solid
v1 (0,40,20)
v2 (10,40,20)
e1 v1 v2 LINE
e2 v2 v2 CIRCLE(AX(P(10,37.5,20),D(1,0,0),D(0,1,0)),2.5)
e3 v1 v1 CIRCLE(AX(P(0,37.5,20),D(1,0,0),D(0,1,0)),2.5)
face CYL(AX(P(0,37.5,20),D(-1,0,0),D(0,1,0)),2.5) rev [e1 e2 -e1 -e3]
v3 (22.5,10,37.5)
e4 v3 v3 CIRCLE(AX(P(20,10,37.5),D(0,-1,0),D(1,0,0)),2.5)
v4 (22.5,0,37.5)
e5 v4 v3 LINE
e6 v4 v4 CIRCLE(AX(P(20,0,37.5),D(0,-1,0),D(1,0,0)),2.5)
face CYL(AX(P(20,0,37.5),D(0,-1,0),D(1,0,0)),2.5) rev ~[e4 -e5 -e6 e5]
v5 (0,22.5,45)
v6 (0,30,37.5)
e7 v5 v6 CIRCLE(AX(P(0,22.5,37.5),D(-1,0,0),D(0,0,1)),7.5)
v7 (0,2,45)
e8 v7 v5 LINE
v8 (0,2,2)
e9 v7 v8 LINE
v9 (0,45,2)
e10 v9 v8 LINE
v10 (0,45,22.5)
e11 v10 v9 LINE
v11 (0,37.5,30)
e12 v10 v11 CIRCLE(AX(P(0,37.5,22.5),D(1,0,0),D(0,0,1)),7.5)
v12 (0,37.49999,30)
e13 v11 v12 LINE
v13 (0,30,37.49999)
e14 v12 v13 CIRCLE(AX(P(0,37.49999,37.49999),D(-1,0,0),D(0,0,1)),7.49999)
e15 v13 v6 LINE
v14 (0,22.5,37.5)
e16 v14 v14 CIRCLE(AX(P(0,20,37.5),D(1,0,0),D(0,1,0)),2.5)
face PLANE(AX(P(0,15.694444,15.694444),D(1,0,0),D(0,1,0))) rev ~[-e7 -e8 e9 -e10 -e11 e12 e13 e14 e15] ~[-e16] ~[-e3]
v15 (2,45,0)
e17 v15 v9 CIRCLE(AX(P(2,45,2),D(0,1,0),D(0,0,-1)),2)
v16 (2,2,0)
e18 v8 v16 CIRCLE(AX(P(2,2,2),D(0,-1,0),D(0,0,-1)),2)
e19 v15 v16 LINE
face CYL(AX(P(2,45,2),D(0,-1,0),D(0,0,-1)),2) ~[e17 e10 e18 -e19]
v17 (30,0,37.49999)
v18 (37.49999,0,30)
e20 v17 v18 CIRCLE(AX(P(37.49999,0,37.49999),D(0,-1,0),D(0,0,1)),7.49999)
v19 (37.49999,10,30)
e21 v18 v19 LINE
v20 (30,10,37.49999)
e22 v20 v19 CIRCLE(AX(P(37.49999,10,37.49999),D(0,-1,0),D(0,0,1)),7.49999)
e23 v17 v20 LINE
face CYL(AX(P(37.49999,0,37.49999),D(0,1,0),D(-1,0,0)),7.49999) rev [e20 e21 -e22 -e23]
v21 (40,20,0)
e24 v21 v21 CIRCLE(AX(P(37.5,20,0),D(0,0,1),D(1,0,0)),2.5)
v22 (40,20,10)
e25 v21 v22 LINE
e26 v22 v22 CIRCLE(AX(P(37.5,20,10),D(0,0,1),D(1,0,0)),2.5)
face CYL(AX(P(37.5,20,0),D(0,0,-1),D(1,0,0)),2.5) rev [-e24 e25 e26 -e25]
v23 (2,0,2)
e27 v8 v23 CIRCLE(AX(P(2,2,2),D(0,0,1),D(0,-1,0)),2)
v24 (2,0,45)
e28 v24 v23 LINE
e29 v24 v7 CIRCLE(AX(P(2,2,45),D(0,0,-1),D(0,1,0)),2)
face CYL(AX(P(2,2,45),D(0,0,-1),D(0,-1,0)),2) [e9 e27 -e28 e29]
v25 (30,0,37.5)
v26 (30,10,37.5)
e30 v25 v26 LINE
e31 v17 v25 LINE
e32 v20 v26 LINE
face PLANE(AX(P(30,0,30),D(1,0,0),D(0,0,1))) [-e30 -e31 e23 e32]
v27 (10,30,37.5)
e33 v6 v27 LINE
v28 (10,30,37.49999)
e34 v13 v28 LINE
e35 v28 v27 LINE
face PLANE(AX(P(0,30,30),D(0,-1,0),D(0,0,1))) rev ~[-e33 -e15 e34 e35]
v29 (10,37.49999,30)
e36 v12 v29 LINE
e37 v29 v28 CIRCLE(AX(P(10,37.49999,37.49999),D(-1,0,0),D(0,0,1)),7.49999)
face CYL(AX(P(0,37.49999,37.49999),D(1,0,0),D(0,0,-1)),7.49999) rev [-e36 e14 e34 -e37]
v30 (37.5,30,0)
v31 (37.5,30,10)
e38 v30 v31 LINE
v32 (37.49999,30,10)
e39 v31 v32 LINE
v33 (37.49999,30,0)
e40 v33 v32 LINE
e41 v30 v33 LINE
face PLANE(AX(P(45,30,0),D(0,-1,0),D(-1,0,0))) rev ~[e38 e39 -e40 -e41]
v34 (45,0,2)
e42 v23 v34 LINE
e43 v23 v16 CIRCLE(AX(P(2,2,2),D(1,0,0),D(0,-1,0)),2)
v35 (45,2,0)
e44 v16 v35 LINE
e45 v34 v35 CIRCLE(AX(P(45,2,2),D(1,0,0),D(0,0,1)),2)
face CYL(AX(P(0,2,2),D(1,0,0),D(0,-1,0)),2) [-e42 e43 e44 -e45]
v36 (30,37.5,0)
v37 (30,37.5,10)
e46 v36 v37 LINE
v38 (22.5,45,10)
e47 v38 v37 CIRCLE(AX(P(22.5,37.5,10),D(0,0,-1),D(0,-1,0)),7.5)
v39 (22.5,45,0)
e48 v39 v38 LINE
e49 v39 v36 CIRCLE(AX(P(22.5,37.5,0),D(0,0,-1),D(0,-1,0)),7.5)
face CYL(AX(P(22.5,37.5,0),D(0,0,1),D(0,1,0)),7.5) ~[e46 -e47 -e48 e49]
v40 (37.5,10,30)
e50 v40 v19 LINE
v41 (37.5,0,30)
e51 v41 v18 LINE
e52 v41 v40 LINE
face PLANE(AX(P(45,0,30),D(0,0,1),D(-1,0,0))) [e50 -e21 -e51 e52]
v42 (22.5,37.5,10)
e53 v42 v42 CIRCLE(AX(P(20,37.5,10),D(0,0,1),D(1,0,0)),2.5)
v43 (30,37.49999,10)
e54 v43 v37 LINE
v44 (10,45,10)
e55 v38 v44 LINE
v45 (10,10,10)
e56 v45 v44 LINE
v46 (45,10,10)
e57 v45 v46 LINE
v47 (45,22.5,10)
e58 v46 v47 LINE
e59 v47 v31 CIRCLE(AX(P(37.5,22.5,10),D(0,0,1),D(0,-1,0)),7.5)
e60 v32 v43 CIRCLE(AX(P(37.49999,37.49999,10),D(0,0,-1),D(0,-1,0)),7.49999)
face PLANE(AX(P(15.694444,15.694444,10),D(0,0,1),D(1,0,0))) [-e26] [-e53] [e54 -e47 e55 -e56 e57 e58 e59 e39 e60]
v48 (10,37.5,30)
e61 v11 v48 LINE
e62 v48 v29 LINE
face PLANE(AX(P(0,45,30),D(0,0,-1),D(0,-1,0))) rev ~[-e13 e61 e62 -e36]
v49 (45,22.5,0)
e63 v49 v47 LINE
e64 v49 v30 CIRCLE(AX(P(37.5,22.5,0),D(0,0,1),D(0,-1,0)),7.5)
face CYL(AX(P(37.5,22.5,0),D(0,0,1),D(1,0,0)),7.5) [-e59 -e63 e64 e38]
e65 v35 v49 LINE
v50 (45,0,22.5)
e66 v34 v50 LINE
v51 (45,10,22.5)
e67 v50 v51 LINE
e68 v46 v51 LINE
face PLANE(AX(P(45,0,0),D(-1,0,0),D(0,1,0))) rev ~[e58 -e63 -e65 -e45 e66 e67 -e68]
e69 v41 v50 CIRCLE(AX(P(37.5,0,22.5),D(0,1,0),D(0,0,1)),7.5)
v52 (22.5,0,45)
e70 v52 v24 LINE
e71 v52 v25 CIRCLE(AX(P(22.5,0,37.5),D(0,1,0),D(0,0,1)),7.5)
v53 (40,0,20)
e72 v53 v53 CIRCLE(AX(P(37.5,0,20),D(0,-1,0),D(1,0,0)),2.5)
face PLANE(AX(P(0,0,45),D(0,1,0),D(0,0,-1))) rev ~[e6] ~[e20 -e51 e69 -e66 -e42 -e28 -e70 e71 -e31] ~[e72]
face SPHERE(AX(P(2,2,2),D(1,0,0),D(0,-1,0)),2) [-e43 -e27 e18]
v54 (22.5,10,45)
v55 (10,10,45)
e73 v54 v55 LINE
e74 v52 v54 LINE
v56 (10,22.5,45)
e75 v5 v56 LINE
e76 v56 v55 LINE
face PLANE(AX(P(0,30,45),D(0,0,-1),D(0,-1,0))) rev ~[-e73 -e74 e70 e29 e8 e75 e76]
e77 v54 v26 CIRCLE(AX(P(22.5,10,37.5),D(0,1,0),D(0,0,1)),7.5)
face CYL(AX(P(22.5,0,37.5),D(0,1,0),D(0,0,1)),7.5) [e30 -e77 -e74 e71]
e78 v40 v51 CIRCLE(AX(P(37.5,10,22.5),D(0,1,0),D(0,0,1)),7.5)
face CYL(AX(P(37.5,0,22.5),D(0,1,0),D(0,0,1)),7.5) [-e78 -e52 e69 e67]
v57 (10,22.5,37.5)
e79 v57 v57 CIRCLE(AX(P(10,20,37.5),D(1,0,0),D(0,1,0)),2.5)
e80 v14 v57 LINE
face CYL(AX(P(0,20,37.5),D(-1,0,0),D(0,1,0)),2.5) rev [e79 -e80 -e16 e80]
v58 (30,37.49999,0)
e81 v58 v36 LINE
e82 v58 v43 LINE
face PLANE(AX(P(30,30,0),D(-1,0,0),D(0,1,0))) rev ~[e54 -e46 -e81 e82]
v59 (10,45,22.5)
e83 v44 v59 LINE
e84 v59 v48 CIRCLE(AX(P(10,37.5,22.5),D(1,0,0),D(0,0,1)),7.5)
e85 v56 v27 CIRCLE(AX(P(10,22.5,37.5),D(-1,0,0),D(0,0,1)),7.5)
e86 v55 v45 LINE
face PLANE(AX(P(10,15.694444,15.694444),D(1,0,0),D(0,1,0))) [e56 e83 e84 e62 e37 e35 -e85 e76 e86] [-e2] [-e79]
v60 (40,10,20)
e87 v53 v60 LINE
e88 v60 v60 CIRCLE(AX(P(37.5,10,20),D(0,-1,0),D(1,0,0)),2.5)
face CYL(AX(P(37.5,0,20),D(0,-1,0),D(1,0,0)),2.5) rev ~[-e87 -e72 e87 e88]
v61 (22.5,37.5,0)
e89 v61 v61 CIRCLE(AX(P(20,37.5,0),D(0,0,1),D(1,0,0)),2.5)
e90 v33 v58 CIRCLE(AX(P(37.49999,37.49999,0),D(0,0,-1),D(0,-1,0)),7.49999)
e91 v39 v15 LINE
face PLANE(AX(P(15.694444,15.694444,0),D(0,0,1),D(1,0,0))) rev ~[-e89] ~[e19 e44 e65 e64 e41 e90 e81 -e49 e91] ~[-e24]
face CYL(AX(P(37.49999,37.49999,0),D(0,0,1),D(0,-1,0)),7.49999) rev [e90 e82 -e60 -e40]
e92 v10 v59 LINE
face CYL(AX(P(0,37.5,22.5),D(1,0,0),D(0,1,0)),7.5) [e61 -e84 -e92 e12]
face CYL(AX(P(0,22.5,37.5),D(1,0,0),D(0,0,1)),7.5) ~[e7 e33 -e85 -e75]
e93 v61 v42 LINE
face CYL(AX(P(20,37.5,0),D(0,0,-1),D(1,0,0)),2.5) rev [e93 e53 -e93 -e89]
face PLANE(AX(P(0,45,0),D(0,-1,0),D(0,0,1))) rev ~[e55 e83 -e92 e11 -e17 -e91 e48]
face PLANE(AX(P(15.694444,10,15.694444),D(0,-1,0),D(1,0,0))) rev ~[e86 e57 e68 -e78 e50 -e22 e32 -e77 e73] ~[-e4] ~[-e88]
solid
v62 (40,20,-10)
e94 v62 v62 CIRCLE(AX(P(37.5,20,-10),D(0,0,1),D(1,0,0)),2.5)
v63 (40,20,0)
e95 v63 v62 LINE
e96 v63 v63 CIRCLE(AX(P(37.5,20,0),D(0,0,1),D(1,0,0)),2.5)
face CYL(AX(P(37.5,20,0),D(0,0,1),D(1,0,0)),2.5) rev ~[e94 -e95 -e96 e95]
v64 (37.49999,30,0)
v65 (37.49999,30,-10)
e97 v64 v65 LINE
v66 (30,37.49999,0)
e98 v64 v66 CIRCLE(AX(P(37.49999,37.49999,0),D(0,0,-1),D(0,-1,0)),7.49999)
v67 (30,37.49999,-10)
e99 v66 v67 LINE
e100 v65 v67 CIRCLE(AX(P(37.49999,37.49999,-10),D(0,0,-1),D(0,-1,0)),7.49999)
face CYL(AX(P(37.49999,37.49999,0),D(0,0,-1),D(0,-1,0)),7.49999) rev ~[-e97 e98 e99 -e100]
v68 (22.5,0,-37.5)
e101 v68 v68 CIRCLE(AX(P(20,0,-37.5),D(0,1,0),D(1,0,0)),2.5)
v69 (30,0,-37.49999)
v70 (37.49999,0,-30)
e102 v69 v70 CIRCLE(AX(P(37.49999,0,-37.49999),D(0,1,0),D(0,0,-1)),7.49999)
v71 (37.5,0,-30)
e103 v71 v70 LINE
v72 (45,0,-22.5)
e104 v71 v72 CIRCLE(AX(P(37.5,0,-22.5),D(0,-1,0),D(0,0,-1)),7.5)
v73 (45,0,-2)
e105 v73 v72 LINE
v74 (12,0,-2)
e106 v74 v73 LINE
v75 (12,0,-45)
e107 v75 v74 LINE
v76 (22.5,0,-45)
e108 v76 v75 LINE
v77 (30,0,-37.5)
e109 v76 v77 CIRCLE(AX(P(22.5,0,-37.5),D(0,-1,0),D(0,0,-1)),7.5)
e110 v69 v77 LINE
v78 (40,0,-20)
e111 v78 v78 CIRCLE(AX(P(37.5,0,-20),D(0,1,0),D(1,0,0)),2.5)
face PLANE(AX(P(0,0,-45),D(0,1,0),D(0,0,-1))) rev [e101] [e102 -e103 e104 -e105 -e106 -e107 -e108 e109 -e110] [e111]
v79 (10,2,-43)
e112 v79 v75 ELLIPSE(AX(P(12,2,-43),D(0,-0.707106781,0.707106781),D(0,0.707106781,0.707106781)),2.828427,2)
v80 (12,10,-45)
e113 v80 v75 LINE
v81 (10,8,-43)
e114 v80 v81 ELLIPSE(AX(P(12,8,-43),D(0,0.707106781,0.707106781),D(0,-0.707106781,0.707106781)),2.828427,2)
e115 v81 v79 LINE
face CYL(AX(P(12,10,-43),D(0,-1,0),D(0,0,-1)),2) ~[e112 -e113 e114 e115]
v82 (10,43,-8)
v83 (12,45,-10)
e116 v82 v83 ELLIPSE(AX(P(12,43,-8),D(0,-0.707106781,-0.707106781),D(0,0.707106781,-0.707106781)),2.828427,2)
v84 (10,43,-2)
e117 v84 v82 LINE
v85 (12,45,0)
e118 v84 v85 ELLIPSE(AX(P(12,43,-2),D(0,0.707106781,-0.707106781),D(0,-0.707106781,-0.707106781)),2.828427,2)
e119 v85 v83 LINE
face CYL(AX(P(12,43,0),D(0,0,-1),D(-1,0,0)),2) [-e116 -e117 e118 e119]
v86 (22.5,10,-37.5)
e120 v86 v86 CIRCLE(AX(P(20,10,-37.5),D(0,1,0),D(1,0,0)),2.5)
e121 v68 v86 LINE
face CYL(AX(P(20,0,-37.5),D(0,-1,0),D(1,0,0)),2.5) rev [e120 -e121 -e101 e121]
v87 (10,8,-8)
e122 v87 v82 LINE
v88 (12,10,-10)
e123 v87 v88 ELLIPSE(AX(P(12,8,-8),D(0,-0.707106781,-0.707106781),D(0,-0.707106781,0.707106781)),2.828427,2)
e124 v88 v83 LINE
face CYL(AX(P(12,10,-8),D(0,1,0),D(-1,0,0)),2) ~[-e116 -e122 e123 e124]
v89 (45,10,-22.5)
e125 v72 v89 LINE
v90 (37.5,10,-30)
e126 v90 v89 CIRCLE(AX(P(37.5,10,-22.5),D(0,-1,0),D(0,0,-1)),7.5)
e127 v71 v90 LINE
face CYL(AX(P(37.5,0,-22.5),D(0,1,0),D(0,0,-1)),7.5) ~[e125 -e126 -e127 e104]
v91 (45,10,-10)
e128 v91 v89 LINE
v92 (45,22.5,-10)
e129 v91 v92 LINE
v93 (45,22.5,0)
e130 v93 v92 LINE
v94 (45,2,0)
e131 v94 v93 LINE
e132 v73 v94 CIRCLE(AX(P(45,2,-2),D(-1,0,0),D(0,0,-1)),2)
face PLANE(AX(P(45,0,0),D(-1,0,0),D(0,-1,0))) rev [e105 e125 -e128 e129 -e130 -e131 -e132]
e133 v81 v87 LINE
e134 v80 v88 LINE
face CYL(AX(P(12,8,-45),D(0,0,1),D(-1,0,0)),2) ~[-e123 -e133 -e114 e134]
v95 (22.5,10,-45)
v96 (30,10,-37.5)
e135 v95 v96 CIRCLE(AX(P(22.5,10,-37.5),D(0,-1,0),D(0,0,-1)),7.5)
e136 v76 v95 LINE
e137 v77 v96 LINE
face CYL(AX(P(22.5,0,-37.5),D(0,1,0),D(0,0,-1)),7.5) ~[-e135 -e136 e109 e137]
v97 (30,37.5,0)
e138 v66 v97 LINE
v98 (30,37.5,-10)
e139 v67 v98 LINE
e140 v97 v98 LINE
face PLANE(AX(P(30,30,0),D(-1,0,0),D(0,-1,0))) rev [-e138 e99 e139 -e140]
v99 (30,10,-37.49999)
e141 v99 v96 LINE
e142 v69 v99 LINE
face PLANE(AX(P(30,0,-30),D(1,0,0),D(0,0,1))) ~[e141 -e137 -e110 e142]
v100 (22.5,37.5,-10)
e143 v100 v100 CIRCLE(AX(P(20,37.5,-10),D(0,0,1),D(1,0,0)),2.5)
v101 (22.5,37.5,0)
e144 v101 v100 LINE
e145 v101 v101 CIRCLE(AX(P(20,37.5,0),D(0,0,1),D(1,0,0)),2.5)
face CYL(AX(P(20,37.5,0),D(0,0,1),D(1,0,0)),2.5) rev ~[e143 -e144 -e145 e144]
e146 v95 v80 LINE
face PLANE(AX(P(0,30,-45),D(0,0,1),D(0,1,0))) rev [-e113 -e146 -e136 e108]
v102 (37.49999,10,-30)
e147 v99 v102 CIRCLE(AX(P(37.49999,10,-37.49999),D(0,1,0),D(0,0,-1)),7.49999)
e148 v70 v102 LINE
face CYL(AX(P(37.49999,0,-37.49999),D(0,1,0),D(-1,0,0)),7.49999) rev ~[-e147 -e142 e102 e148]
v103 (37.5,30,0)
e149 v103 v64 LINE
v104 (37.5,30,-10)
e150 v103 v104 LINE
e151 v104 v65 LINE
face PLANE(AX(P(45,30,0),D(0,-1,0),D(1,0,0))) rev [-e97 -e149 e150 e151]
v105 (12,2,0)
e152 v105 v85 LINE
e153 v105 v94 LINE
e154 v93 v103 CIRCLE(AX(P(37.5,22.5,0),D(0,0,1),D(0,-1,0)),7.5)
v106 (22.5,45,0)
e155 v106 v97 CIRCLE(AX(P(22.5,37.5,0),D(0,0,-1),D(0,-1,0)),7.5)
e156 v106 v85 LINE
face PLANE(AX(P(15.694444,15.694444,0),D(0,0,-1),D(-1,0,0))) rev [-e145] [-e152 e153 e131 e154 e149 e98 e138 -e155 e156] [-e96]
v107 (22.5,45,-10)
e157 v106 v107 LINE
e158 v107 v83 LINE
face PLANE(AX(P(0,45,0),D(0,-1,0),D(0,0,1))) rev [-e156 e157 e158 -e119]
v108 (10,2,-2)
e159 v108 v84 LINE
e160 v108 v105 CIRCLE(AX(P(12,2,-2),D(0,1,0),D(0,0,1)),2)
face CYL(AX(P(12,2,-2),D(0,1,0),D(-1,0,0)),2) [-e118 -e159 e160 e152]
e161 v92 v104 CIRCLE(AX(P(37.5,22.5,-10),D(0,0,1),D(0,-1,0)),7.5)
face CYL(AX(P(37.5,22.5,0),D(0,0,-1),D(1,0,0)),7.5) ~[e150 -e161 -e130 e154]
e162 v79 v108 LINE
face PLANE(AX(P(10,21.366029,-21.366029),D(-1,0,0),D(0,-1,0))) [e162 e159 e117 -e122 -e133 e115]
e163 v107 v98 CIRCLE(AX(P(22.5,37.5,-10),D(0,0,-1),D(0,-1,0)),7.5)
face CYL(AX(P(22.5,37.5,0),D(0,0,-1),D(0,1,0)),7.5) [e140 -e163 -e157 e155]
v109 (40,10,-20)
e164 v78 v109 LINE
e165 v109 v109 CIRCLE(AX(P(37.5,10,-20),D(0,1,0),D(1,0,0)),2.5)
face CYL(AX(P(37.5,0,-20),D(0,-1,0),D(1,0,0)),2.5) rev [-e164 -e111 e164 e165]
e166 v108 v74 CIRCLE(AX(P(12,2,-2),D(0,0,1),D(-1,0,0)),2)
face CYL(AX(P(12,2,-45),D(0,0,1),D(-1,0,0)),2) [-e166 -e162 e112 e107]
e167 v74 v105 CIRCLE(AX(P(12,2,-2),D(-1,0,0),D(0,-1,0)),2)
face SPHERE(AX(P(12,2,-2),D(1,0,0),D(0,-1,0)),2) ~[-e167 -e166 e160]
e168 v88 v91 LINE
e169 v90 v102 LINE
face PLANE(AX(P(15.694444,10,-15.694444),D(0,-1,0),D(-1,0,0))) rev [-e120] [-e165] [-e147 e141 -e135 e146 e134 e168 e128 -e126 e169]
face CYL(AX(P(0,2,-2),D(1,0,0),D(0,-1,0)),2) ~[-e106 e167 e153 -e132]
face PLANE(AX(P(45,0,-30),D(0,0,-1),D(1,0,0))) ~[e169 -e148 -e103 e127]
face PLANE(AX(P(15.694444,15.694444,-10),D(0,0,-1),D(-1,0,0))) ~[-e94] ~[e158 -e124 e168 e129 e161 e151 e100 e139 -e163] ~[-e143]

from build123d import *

# Parameters (mm, degrees)
F0_R      = 2.5
F1_DEPTH  = 10
F2_R      = 2.5
F3_DEPTH  = 10
F4_R      = 2.5
F5_DEPTH  = 10
F6_R      = 2
F7_R      = 7.5
F8_R      = 7.49999
F10_R     = 2.5
F11_DEPTH = 10
F12_R     = 2


# Not quite as in the source:
# - a fillet or chamfer is up to 0.001 mm smaller than in the source, because OpenCascade refuses the exact size
# - a feature names something its author has since deleted; it is built from what else it names


with BuildPart() as f1:
    # F0 (on Top) → F1 (new body)
    with BuildSketch(Plane.XY):
        Polygon((10, 10), (10, 45), (0, 45), (0, 0), (45, 0), (45, 10), align=None)
        Polygon((30, 45), (10, 45), (10, 10), (45, 10), (45, 30), (30, 30), align=None)
        with Locations((37.5, 20)):
            Circle(F0_R, mode=Mode.SUBTRACT)
        with Locations((20, 37.5)):
            Circle(F0_R, mode=Mode.SUBTRACT)
    extrude(amount=F1_DEPTH)

    # F2 (on Right) → F3 (join)
    with BuildSketch(Plane.YZ):
        Polygon((10, 10), (10, 45), (0, 45), (0, 0), (45, 0), (45, 10), align=None)
        Polygon((30, 45), (10, 45), (10, 10), (45, 10), (45, 30), (30, 30), align=None)
        with Locations((37.5, 20)):
            Circle(F2_R, mode=Mode.SUBTRACT)
        with Locations((20, 37.5)):
            Circle(F2_R, mode=Mode.SUBTRACT)
    extrude(amount=F3_DEPTH)

    # F4 (on Front) → F5 (join)
    with BuildSketch(Plane.XZ):
        Polygon((10, 10), (10, 45), (0, 45), (0, 0), (45, 0), (45, 10), align=None)
        Polygon((30, 45), (10, 45), (10, 10), (45, 10), (45, 30), (30, 30), align=None)
        with Locations((37.5, 20)):
            Circle(F4_R, mode=Mode.SUBTRACT)
        with Locations((20, 37.5)):
            Circle(F4_R, mode=Mode.SUBTRACT)
    extrude(amount=-F5_DEPTH)

    # F6
    f6_edges = [f1.edges().sort_by_distance(p)[0] for p in [
        (22.5, 0, 0),
        (0, 0, 22.5),
        (0, 22.5, 0),
    ]]
    fillet(f6_edges, radius=F6_R)

    # F7
    f7_edges = [f1.edges().sort_by_distance(p)[0] for p in [
        (45, 5, 30),
        (30, 5, 45),
        (5, 30, 45),
        (5, 45, 30),
        (30, 45, 5),
        (45, 30, 5),
    ]]
    fillet(f7_edges, radius=F7_R)

    # F8 (radius 7.5 in the source; OpenCascade refuses exactly that, so slightly less here)
    f8_edges = [f1.edges().sort_by_distance(p)[0] for p in [
        (30, 5, 30),
        (30, 30, 5),
        (5, 30, 30),
    ]]
    fillet(f8_edges, radius=F8_R)


with BuildPart() as f9_1:
    # F9: instance of F1
    add(f1.part.mirror(Plane.XY))

    # F10 (on face) → F11 (cut, through all)
    with BuildSketch(Plane(origin=(0, 0, 0), x_dir=(0, -1, 0), z_dir=(-1, 0, 0))):
        with BuildLine():
            Line((-45, -2), (-45, -22.5))
            ThreePointArc((-45, -22.5), (-42.8033008589, -27.8033008589), (-37.5, -30))
            ThreePointArc((-37.5, -30), (-32.1966991411, -32.1966991411), (-30, -37.5))
            ThreePointArc((-30, -37.5), (-27.8033008589, -42.8033008589), (-22.5, -45))
            Line((-22.5, -45), (-2, -45))
            Line((-2, -45), (-2, -2))
            Line((-2, -2), (-45, -2))
        make_face()
        with Locations((-20, -37.5)):
            Circle(F10_R, mode=Mode.SUBTRACT)
        with Locations((-37.5, -20)):
            Circle(F10_R, mode=Mode.SUBTRACT)
        with BuildLine():
            Line((-45, 0), (-45, -2))
            Line((-45, -2), (-2, -2))
            Line((-2, -2), (-2, -45))
            Line((-2, -45), (0, -45))
            Line((0, -45), (0, -37.5))
            Line((0, -37.5), (0, -30))
            Line((0, -30), (0, -22.5))
            Line((0, -22.5), (0, -2))
            ThreePointArc((0, -2), (-0.5857864376, -0.5857864376), (-2, 0))
            Line((-2, 0), (-45, 0))
        make_face()
    extrude(amount=-F11_DEPTH, mode=Mode.SUBTRACT)

    # F12
    f12_edges = [f9_1.edges().sort_by_distance(p)[0] for p in [
        (10, 45, -5),
        (10, 23.5, 0),
        (10, 0.585786, -0.585786),
        (10, 0, -23.5),
        (10, 5, -45),
        (10, 10, -27.5),
        (10, 27.5, -10),
    ]]
    fillet(f12_edges, radius=F12_R)


solid = Compound([f1.part, f9_1.part])
